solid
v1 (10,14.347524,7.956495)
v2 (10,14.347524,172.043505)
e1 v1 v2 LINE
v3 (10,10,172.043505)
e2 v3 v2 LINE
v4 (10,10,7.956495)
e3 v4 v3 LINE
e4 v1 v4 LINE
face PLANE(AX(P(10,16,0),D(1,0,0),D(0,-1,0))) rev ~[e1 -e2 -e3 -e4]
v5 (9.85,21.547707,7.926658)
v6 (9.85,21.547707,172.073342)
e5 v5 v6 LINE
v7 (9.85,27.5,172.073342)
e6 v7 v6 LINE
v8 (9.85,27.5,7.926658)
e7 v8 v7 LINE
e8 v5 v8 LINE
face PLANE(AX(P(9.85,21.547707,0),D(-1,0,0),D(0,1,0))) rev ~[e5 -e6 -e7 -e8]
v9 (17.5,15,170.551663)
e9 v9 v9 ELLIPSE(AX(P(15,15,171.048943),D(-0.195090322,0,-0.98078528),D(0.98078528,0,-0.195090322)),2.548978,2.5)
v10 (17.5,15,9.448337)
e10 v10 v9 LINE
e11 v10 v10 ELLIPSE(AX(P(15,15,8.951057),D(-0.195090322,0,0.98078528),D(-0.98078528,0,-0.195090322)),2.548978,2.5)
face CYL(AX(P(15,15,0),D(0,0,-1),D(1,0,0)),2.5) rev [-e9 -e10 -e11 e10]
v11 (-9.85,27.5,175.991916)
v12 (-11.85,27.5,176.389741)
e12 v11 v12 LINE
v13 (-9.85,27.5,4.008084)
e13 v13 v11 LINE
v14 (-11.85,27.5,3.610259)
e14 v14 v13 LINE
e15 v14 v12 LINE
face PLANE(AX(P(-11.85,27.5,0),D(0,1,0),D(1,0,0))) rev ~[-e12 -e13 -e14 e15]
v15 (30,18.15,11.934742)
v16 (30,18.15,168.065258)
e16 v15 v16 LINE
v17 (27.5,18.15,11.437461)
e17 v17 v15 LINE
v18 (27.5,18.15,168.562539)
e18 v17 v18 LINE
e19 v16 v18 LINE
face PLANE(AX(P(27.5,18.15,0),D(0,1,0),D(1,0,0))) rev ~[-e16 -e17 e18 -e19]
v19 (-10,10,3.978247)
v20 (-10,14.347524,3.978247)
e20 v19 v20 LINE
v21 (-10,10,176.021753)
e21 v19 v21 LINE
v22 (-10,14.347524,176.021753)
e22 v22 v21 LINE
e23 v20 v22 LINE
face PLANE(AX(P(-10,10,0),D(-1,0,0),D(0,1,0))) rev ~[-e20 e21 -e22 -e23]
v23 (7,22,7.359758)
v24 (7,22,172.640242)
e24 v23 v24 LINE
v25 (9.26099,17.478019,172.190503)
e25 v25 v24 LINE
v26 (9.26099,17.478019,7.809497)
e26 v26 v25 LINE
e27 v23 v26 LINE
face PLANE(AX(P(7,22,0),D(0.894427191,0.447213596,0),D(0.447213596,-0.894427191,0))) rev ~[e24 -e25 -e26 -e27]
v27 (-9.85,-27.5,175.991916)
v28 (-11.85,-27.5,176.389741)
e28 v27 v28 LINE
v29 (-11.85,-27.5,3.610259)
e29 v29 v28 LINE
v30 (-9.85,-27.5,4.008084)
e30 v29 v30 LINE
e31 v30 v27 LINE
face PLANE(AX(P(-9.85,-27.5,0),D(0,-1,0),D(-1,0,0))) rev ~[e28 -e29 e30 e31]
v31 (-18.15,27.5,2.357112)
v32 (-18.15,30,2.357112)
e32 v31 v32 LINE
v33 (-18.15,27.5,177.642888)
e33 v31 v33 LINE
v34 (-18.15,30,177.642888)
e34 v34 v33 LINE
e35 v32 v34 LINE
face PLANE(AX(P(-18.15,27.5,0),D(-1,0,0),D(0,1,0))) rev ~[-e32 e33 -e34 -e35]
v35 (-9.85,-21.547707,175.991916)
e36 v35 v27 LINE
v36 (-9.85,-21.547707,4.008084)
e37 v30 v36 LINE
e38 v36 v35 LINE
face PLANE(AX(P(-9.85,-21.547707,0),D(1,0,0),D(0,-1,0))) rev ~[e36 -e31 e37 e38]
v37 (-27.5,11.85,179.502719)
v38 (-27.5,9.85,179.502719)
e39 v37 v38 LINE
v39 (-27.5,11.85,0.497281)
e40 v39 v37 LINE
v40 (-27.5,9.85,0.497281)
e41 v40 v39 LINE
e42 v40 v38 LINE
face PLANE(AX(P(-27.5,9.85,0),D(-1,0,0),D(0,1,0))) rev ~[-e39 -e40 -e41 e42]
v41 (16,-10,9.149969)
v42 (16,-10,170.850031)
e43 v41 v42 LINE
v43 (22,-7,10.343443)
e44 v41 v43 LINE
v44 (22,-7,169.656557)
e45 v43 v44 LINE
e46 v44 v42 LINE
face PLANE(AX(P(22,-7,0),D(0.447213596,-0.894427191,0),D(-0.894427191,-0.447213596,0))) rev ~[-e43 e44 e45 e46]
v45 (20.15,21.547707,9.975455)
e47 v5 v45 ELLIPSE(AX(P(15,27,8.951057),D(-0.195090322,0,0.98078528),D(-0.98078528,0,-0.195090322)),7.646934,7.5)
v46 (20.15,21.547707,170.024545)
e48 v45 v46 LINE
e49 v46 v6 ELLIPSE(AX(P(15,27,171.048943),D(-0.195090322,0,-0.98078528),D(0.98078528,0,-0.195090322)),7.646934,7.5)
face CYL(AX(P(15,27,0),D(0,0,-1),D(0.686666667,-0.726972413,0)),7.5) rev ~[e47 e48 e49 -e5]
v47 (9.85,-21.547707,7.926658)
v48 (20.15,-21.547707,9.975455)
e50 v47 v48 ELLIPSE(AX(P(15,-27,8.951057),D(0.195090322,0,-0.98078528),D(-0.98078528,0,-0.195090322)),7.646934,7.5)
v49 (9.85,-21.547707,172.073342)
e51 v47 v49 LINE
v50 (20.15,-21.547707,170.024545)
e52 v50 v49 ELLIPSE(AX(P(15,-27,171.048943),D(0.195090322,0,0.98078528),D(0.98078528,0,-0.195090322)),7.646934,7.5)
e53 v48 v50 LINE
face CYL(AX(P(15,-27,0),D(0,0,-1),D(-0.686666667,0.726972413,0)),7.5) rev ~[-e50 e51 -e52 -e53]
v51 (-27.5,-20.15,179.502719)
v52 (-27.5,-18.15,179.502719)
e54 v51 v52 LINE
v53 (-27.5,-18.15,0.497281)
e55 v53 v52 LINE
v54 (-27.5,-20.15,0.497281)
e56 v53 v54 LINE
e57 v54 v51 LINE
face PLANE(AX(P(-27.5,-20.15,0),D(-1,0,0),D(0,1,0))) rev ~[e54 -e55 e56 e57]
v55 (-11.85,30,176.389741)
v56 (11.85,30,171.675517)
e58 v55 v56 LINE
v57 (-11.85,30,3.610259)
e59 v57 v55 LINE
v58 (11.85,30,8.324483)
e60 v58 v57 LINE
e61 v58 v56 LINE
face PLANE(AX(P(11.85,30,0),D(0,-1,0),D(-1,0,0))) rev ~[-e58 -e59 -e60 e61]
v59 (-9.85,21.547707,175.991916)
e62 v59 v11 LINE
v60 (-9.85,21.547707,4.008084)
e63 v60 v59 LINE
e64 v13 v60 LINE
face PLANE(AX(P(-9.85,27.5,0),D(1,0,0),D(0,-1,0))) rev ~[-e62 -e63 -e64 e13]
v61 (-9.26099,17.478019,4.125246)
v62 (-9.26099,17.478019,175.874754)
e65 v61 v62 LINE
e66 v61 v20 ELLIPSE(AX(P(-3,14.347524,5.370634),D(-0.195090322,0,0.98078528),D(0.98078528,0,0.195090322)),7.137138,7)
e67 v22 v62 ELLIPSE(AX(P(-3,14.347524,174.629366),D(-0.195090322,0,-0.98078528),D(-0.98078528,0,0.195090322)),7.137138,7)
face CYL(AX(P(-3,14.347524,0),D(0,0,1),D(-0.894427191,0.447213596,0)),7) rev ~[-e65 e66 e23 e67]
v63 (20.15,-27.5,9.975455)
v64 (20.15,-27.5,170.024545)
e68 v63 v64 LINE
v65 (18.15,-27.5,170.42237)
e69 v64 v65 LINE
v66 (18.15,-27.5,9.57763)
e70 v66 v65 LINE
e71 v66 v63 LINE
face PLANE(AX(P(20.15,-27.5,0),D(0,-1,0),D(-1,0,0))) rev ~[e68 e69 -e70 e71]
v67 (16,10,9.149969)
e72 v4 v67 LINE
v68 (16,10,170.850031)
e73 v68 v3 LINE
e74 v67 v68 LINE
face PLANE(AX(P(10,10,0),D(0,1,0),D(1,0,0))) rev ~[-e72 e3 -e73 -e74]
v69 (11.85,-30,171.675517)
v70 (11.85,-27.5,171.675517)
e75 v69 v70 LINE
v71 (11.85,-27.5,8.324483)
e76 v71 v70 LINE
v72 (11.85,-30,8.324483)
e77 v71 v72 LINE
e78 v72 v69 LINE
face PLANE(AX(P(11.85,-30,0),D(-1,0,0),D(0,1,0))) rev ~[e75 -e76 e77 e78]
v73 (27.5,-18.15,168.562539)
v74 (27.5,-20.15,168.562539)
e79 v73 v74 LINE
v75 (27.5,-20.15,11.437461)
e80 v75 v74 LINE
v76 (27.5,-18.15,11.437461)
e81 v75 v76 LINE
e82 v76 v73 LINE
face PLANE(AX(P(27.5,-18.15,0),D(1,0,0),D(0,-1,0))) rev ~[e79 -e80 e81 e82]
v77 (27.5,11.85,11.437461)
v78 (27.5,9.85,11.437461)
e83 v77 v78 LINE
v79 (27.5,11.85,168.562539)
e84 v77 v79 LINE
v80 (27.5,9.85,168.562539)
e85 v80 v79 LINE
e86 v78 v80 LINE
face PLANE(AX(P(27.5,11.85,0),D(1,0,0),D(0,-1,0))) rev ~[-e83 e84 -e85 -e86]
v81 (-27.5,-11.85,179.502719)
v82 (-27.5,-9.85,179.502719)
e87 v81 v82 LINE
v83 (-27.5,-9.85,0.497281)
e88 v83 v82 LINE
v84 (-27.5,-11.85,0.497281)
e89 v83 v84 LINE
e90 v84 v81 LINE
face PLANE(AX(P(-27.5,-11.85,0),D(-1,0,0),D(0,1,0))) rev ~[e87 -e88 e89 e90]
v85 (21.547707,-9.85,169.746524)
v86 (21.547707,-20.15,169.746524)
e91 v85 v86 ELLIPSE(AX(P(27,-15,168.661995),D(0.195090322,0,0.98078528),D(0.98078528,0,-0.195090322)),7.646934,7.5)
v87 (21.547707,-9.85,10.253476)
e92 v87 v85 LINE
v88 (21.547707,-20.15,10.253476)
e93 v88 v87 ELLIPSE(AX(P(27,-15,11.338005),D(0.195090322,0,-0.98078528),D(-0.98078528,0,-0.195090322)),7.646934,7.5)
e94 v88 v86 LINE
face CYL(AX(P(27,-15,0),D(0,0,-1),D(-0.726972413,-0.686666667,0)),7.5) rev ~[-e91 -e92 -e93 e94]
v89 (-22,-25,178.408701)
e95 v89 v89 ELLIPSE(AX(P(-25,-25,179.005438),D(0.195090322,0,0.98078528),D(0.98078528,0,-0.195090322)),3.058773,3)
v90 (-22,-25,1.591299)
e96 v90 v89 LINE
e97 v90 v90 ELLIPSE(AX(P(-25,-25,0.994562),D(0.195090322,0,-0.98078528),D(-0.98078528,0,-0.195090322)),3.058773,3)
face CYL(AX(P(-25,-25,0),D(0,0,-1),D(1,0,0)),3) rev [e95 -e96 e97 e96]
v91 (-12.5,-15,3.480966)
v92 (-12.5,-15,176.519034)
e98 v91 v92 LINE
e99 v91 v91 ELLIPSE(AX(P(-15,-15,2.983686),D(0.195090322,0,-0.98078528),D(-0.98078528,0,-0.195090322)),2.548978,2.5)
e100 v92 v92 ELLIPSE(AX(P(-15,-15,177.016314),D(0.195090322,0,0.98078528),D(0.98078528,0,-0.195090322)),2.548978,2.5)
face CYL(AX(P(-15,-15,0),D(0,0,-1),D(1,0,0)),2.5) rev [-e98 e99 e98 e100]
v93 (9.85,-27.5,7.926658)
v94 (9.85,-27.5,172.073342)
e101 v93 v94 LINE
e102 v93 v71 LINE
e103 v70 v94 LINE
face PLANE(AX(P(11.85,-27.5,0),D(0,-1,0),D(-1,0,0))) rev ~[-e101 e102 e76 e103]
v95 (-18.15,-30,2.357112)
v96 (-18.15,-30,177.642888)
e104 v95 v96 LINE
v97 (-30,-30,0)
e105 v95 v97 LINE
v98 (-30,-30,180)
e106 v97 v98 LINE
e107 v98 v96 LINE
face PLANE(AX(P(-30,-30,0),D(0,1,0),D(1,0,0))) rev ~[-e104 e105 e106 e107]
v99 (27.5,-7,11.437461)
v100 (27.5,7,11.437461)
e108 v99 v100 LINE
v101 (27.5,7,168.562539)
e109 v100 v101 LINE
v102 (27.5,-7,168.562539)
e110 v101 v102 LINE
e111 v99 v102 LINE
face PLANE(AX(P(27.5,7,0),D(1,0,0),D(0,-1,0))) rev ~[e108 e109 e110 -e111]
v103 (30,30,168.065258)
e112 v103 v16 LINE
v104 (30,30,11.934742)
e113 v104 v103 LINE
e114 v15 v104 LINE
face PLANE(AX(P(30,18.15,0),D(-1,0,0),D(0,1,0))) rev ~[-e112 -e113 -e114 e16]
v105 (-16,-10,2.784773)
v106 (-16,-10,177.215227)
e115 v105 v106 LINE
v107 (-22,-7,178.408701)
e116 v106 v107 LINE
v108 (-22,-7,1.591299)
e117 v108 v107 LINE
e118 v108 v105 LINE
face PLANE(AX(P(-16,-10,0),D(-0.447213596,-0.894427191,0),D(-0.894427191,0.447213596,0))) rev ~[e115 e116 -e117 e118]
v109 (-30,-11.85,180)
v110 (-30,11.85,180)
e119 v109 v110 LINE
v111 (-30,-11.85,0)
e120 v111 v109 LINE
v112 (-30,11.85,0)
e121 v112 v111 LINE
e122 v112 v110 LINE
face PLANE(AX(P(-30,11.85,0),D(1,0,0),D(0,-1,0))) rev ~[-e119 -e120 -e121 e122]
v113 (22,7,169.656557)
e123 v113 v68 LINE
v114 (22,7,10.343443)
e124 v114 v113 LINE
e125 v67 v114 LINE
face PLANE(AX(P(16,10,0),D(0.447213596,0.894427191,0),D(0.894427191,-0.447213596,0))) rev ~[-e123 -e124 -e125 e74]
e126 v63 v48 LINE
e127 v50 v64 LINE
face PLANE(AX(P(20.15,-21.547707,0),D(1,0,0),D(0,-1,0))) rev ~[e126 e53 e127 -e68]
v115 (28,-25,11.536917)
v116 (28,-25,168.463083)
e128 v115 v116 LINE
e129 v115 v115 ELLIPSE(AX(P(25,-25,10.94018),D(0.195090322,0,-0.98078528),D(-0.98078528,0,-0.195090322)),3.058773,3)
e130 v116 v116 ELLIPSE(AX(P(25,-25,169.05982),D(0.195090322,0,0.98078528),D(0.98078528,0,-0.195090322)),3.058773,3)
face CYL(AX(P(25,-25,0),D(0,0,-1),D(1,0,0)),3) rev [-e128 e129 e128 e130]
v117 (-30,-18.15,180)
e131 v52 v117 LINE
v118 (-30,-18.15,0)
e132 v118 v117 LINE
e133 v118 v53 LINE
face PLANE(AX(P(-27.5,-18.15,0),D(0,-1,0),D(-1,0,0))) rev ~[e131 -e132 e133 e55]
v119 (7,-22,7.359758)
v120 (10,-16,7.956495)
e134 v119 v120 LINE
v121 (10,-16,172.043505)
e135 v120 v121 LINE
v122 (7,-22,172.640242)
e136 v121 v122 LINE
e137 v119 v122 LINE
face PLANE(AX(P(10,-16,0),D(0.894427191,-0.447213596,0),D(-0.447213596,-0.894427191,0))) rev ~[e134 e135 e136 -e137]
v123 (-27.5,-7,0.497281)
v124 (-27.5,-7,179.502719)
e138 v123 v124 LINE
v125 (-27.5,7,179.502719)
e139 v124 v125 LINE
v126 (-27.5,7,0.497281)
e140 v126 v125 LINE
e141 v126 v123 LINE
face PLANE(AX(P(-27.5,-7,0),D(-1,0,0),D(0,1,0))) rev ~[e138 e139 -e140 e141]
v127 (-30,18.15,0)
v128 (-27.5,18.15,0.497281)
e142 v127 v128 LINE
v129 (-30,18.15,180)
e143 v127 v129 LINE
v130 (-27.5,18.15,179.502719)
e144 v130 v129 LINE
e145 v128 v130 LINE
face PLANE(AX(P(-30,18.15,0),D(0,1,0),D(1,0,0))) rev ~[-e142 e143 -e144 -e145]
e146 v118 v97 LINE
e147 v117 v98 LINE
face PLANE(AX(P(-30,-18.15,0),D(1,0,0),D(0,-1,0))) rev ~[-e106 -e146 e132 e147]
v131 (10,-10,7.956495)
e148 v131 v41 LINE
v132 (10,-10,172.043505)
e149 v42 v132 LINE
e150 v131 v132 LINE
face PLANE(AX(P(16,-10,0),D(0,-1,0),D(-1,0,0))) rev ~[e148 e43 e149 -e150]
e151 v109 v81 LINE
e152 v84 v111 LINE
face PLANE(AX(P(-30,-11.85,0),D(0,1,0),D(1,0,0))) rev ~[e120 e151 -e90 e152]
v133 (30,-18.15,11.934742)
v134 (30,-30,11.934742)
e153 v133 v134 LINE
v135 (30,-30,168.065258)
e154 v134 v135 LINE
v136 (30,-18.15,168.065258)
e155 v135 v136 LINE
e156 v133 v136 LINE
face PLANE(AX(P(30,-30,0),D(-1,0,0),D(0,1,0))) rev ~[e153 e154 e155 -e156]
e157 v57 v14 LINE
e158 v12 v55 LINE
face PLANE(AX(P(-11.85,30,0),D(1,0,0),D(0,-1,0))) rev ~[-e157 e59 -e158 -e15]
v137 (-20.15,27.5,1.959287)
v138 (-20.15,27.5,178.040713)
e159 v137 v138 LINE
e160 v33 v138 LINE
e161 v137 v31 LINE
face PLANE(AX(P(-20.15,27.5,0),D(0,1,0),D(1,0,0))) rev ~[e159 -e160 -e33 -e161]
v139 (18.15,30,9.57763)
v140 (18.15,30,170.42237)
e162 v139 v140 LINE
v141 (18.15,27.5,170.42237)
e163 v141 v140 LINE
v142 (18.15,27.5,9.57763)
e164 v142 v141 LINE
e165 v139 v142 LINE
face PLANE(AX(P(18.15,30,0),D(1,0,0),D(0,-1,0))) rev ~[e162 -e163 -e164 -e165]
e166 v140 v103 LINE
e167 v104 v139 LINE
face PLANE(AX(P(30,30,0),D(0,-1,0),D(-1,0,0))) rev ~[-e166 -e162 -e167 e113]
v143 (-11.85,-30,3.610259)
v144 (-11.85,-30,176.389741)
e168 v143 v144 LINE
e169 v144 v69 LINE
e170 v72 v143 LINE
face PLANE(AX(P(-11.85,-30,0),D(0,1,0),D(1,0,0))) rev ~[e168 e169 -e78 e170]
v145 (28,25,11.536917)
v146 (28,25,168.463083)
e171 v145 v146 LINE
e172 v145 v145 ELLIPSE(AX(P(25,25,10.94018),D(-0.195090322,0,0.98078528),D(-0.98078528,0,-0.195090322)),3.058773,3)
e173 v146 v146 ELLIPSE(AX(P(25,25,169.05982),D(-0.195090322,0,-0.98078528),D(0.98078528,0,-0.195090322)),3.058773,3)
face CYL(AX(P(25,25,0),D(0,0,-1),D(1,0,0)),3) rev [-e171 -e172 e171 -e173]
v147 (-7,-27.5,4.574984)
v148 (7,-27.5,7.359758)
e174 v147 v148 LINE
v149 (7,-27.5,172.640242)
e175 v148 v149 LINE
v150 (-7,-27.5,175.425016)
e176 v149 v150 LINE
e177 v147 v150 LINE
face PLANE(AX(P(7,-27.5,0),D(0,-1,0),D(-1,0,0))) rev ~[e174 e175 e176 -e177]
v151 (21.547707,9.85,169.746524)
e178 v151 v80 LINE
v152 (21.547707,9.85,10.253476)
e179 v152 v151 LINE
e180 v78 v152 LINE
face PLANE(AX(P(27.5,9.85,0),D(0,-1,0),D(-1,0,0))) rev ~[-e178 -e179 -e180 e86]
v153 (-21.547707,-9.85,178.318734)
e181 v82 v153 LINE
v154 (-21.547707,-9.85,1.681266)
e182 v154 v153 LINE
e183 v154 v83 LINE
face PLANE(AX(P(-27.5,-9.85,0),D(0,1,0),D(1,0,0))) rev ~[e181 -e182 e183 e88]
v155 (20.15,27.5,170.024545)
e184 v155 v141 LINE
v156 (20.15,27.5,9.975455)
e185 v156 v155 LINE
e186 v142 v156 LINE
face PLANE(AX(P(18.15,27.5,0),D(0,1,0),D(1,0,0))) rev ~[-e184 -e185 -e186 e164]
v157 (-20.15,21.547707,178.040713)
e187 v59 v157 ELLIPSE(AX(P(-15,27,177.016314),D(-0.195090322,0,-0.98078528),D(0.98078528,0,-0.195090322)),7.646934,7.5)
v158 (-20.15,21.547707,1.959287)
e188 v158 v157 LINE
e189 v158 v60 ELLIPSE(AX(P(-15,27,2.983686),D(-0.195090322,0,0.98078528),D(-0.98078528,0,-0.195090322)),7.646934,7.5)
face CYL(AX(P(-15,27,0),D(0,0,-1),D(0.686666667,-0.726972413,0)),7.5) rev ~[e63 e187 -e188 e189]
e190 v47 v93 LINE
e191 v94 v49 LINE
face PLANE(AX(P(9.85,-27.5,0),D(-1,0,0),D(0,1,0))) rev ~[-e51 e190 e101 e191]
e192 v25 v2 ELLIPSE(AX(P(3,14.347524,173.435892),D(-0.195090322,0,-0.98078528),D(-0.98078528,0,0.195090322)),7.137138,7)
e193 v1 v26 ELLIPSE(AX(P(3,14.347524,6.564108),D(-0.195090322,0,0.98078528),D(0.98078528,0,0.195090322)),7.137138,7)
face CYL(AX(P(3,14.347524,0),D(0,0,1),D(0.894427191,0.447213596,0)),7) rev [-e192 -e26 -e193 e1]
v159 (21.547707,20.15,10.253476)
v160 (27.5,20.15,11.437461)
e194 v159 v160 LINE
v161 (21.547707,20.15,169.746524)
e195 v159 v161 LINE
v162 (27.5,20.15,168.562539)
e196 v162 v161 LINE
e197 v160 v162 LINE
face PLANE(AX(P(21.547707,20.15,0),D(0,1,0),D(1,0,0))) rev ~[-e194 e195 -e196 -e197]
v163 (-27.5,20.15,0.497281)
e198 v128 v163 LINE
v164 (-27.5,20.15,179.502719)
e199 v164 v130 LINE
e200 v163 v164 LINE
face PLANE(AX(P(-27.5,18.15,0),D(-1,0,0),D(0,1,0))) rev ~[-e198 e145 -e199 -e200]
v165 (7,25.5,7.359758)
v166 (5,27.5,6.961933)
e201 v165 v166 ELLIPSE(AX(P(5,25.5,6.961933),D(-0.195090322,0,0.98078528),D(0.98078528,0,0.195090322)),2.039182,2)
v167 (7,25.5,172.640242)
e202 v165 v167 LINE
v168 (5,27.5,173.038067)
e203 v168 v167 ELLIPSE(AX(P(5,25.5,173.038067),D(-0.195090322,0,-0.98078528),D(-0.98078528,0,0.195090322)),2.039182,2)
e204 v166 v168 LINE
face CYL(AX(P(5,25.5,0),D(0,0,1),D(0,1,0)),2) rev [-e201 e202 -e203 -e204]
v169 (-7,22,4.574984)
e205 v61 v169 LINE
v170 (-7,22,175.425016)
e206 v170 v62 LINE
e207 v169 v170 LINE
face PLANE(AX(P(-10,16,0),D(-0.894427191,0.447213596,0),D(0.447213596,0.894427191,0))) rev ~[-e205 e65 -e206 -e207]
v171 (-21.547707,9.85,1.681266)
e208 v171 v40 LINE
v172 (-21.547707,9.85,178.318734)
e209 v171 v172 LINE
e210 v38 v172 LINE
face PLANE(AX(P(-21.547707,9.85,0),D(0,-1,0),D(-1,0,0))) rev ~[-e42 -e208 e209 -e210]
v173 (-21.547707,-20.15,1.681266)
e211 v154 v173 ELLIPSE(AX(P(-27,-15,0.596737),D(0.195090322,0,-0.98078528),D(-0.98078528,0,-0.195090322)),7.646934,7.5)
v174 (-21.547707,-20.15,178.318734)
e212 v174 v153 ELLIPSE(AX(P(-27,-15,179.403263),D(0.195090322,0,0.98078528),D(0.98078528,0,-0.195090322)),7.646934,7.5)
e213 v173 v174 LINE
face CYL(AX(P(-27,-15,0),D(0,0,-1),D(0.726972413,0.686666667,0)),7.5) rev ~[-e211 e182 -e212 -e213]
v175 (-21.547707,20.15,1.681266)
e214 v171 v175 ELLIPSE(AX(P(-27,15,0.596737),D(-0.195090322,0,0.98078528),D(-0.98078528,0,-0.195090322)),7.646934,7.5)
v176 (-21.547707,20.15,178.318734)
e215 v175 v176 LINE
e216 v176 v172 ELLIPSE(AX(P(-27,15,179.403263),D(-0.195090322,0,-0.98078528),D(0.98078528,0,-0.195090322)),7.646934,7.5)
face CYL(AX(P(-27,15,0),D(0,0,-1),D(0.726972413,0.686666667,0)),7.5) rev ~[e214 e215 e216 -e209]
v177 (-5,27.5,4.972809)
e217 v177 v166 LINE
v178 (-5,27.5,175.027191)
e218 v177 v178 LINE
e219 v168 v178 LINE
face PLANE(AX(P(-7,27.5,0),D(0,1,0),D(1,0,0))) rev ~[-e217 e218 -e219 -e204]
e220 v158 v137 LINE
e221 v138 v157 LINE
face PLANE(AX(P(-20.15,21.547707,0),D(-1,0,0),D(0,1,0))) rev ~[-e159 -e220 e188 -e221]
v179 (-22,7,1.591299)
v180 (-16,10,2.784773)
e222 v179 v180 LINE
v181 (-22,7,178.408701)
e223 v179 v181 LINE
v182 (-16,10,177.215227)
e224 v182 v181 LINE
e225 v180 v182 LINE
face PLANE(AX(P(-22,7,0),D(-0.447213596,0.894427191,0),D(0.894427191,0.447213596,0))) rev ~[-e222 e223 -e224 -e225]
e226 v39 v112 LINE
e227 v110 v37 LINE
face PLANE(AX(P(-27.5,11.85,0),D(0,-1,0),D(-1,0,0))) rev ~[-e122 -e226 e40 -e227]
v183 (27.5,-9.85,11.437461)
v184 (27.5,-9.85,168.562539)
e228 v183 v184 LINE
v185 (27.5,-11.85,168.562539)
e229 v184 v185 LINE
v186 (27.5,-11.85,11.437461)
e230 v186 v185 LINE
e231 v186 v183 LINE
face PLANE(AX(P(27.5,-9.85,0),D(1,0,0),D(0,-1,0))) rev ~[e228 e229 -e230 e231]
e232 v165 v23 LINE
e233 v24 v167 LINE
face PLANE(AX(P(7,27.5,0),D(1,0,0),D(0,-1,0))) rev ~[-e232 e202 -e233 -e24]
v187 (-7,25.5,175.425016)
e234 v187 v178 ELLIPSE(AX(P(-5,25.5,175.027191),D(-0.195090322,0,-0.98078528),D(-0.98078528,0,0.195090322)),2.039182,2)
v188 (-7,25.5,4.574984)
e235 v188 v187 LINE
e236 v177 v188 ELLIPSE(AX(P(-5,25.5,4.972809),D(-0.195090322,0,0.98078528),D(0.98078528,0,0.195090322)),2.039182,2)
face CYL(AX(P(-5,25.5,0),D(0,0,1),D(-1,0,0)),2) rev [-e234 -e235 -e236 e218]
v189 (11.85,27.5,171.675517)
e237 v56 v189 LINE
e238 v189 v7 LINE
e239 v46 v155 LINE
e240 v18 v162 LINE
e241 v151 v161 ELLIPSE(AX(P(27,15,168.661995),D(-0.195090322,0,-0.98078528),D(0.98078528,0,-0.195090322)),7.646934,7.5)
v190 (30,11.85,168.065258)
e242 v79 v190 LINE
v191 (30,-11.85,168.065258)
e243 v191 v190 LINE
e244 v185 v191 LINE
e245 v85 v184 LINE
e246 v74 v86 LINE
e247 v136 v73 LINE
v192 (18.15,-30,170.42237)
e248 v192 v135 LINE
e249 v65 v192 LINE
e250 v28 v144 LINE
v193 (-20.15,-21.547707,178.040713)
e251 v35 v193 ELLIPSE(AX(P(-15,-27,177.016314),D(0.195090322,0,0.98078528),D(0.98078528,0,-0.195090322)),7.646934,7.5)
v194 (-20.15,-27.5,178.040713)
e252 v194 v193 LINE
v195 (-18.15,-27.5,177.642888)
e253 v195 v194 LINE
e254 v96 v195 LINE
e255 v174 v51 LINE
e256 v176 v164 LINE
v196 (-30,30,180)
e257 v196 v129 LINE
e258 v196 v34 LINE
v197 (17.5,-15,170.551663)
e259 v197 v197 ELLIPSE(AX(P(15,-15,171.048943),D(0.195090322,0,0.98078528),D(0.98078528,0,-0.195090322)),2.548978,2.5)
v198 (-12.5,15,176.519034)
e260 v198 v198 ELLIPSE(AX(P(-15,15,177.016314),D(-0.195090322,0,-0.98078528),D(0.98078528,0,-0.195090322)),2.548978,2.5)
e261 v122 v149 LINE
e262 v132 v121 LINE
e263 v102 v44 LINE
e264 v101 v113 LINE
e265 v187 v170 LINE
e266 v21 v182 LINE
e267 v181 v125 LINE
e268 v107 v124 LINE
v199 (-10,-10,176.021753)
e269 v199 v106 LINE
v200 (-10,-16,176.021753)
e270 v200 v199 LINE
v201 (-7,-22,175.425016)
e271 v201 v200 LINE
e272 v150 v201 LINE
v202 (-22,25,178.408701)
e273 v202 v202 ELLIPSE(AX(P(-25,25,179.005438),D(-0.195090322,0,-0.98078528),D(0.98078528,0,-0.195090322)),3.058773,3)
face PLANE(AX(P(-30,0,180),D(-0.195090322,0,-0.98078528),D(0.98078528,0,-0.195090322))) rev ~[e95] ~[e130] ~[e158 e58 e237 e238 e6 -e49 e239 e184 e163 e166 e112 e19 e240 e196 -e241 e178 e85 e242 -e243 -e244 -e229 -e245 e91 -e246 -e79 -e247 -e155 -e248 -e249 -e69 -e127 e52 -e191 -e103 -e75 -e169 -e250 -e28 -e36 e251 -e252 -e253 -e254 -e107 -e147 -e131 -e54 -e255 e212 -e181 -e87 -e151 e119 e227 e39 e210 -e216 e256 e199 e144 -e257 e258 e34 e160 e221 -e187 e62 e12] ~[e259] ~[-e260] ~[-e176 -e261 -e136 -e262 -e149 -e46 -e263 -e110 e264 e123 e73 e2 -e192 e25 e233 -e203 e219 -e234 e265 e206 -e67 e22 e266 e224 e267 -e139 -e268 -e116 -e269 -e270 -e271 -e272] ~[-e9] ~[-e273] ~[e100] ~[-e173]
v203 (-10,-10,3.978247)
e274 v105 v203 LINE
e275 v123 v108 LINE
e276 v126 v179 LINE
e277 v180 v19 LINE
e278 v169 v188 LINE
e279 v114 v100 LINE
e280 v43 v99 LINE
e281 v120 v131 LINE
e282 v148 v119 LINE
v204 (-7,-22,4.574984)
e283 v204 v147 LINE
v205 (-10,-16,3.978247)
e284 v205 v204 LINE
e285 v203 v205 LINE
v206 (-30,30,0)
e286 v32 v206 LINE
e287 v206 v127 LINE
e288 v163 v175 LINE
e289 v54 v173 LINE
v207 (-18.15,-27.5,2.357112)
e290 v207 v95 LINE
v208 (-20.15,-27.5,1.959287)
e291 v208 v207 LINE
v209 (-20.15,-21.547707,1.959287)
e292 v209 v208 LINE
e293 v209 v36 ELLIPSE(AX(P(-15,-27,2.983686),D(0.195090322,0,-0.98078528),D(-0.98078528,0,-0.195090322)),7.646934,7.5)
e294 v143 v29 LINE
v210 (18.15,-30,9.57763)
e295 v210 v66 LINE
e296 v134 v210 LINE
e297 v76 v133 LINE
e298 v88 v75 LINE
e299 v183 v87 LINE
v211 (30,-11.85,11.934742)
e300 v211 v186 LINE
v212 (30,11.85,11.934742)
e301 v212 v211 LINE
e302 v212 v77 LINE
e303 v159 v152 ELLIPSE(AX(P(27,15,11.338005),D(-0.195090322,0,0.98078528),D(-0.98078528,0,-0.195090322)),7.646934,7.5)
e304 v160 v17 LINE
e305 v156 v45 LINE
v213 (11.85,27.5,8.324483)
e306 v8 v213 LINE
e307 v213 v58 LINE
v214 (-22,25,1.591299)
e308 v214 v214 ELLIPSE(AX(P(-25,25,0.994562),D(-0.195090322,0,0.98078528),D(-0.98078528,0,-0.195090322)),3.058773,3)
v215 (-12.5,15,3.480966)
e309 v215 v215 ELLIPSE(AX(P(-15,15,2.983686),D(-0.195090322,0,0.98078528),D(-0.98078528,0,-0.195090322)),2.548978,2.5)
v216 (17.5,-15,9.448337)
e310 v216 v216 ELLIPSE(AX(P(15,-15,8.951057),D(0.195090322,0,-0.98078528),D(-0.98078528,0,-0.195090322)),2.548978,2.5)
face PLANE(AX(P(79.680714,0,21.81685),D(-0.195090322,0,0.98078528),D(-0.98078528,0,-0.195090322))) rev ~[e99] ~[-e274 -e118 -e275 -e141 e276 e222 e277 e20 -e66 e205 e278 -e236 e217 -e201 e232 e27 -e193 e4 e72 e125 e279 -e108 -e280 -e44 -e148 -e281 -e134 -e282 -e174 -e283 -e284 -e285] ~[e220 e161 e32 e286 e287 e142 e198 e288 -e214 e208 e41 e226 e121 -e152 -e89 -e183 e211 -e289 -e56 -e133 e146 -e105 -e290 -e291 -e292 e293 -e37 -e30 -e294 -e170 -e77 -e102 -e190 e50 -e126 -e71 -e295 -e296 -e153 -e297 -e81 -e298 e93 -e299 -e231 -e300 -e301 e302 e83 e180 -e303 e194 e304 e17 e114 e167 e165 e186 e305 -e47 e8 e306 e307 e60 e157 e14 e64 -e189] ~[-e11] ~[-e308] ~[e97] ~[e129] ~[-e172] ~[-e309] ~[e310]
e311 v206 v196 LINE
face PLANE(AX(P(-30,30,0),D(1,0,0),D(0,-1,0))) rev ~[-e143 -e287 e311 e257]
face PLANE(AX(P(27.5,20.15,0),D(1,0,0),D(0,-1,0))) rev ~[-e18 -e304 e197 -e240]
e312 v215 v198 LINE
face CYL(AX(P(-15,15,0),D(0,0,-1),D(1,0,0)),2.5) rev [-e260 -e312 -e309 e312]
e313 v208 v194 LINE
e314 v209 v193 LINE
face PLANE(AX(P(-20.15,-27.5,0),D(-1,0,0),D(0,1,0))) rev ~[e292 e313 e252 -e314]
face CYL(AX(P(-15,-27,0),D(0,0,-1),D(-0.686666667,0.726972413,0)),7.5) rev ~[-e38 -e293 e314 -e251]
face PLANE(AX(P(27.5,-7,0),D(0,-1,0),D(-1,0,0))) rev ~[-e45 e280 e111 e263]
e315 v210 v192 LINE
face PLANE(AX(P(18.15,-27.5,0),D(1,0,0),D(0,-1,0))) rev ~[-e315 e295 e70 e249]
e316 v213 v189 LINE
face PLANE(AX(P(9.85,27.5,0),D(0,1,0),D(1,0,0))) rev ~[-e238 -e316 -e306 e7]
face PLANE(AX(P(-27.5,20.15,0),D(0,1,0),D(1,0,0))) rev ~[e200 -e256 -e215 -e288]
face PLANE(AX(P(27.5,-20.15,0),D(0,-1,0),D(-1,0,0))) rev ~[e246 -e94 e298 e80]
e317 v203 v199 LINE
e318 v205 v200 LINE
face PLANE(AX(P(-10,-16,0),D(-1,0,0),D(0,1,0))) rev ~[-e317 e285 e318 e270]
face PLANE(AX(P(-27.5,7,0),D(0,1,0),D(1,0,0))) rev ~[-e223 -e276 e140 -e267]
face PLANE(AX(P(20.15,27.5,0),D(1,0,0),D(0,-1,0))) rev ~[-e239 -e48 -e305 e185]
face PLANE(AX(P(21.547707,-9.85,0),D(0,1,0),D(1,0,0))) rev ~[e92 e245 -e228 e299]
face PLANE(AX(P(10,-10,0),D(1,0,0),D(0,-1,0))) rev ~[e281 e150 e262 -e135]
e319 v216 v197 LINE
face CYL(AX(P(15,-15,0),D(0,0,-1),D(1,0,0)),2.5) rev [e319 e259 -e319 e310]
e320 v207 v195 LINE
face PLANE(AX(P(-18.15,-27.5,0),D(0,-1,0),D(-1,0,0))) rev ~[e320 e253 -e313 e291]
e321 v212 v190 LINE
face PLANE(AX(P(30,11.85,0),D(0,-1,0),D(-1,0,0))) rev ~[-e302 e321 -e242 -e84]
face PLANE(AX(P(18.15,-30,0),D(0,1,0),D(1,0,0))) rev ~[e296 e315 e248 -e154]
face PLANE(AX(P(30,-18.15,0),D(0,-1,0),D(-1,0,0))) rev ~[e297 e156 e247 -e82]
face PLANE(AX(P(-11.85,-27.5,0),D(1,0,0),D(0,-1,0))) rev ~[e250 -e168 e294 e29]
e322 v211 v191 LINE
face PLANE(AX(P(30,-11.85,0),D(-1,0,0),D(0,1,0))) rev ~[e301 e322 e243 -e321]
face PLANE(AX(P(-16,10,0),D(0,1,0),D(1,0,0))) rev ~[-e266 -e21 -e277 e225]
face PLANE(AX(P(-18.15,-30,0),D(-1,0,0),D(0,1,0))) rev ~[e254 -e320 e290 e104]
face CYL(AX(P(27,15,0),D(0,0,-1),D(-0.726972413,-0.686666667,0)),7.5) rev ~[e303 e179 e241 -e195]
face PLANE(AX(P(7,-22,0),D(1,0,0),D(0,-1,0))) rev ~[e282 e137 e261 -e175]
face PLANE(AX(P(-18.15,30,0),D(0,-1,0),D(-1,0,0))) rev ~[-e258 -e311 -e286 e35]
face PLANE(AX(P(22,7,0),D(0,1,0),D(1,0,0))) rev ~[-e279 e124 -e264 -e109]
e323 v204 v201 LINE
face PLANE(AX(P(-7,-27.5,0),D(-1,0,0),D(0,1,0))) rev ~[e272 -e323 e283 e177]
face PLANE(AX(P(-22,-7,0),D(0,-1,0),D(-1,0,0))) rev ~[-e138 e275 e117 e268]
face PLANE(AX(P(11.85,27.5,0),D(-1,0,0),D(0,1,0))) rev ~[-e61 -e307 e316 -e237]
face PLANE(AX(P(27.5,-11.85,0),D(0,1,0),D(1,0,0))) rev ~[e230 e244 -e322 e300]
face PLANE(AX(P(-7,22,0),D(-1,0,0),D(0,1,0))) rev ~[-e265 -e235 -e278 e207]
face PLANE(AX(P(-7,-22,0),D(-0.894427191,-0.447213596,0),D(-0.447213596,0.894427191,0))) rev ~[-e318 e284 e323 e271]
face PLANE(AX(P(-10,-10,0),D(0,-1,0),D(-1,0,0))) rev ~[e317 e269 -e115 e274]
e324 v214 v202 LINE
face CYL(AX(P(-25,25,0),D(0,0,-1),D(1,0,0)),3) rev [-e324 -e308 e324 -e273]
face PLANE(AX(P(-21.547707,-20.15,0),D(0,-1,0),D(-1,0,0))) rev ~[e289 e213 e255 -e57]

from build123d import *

# Parameters (mm, degrees)
F0_R          = 3
F0_R_2        = 2.5
F1_DEPTH      = 180
F2_R          = 2
F3_R          = 7
F6_DEPTH      = 30
F6_DEPTH_BACK = 30


# Not quite as in the source:
# - a feature names something its author has since deleted; it is built from what else it names


with BuildPart() as f1:
    # F0 (on Top) → F1 (new body)
    with BuildSketch(Plane.XY):
        with BuildLine():
            Line((18.15, -30), (30, -30))
            Line((30, -30), (30, -18.15))
            Line((30, -18.15), (27.5, -18.15))
            Line((27.5, -18.15), (27.5, -20.15))
            Line((27.5, -20.15), (21.5477069044, -20.15))
            ThreePointArc((21.5477069044, -20.15), (19.5, -15), (21.5477069044, -9.85))
            Line((21.5477069044, -9.85), (27.5, -9.85))
            Line((27.5, -9.85), (27.5, -11.85))
            Line((27.5, -11.85), (30, -11.85))
            Line((30, -11.85), (30, 11.85))
            Line((30, 11.85), (27.5, 11.85))
            Line((27.5, 11.85), (27.5, 9.85))
            Line((27.5, 9.85), (21.5477069044, 9.85))
            ThreePointArc((21.5477069044, 9.85), (19.5, 15), (21.5477069044, 20.15))
            Line((21.5477069044, 20.15), (27.5, 20.15))
            Line((27.5, 20.15), (27.5, 18.15))
            Line((27.5, 18.15), (30, 18.15))
            Line((30, 18.15), (30, 30))
            Line((30, 30), (18.15, 30))
            Line((18.15, 30), (18.15, 27.5))
            Line((18.15, 27.5), (20.15, 27.5))
            Line((20.15, 27.5), (20.15, 21.5477069044))
            ThreePointArc((20.15, 21.5477069044), (15, 19.5), (9.85, 21.5477069044))
            Line((9.85, 21.5477069044), (9.85, 27.5))
            Line((9.85, 27.5), (11.85, 27.5))
            Line((11.85, 27.5), (11.85, 30))
            Line((11.85, 30), (-11.85, 30))
            Line((-11.85, 30), (-11.85, 27.5))
            Line((-11.85, 27.5), (-9.85, 27.5))
            Line((-9.85, 27.5), (-9.85, 21.5477069044))
            ThreePointArc((-9.85, 21.5477069044), (-15, 19.5), (-20.15, 21.5477069044))
            Line((-20.15, 21.5477069044), (-20.15, 27.5))
            Line((-20.15, 27.5), (-18.15, 27.5))
            Line((-18.15, 27.5), (-18.15, 30))
            Line((-18.15, 30), (-30, 30))
            Line((-30, 30), (-30, 18.15))
            Line((-30, 18.15), (-27.5, 18.15))
            Line((-27.5, 18.15), (-27.5, 20.15))
            Line((-27.5, 20.15), (-21.5477069044, 20.15))
            ThreePointArc((-21.5477069044, 20.15), (-19.5, 15), (-21.5477069044, 9.85))
            Line((-21.5477069044, 9.85), (-27.5, 9.85))
            Line((-27.5, 9.85), (-27.5, 11.85))
            Line((-27.5, 11.85), (-30, 11.85))
            Line((-30, 11.85), (-30, -11.85))
            Line((-30, -11.85), (-27.5, -11.85))
            Line((-27.5, -11.85), (-27.5, -9.85))
            Line((-27.5, -9.85), (-21.5477069044, -9.85))
            ThreePointArc((-21.5477069044, -9.85), (-19.5, -15), (-21.5477069044, -20.15))
            Line((-21.5477069044, -20.15), (-27.5, -20.15))
            Line((-27.5, -20.15), (-27.5, -18.15))
            Line((-27.5, -18.15), (-30, -18.15))
            Line((-30, -18.15), (-30, -30))
            Line((-30, -30), (-18.15, -30))
            Line((-18.15, -30), (-18.15, -27.5))
            Line((-18.15, -27.5), (-20.15, -27.5))
            Line((-20.15, -27.5), (-20.15, -21.5477069044))
            ThreePointArc((-20.15, -21.5477069044), (-15, -19.5), (-9.85, -21.5477069044))
            Line((-9.85, -21.5477069044), (-9.85, -27.5))
            Line((-9.85, -27.5), (-11.85, -27.5))
            Line((-11.85, -27.5), (-11.85, -30))
            Line((-11.85, -30), (11.85, -30))
            Line((11.85, -30), (11.85, -27.5))
            Line((11.85, -27.5), (9.85, -27.5))
            Line((9.85, -27.5), (9.85, -21.5477069044))
            ThreePointArc((9.85, -21.5477069044), (15, -19.5), (20.15, -21.5477069044))
            Line((20.15, -21.5477069044), (20.15, -27.5))
            Line((20.15, -27.5), (18.15, -27.5))
            Line((18.15, -27.5), (18.15, -30))
        make_face()
        with Locations((-25, -25)):
            Circle(F0_R, mode=Mode.SUBTRACT)
        with Locations((-15, -15)):
            Circle(F0_R_2, mode=Mode.SUBTRACT)
        with Locations((25, -25)):
            Circle(F0_R, mode=Mode.SUBTRACT)
        with Locations((15, -15)):
            Circle(F0_R_2, mode=Mode.SUBTRACT)
        with Locations((-25, 25)):
            Circle(F0_R, mode=Mode.SUBTRACT)
        with Locations((-15, 15)):
            Circle(F0_R_2, mode=Mode.SUBTRACT)
        Polygon((-7, 22), (-7, 27.5), (0, 27.5), (7, 27.5), (7, 22), (10, 16), (10, 10), (16, 10), (22, 7), (27.5, 7), (27.5, 0), (27.5, -7), (22, -7), (16, -10), (10, -10), (10, -16), (7, -22), (7, -27.5), (0, -27.5), (-7, -27.5), (-7, -22), (-10, -16), (-10, -10), (-16, -10), (-22, -7), (-27.5, -7), (-27.5, 0), (-27.5, 7), (-22, 7), (-16, 10), (-10, 10), (-10, 16), align=None, mode=Mode.SUBTRACT)
        with Locations((15, 15)):
            Circle(F0_R_2, mode=Mode.SUBTRACT)
        with Locations((25, 25)):
            Circle(F0_R, mode=Mode.SUBTRACT)
    extrude(amount=F1_DEPTH)

    # F2
    f2_edges = [f1.edges().sort_by_distance(p)[0] for p in [
        (-7, 27.5, 90),
        (7, 27.5, 90),
    ]]
    fillet(f2_edges, radius=F2_R)

    # F3
    f3_edges = [f1.edges().sort_by_distance(p)[0] for p in [
        (-10, 16, 90),
        (10, 16, 90),
    ]]
    fillet(f3_edges, radius=F3_R)

    # F5 (on Front) → F6 (cut, two sides)
    with BuildSketch(Plane.XZ) as f6_sk:
        Polygon((79.680713533, 21.8168503847), (-30, 0), (-17.5886362159, -62.3961393031), (92.0920773171, -40.5792889183), align=None)
        Polygon((97.6667223127, 202.7474358776), (-20.7884412878, 226.3096328978), (-30, 180), (88.4551636005, 156.4378029799), align=None)
    extrude(amount=F6_DEPTH, mode=Mode.SUBTRACT)
    extrude(f6_sk.sketch, amount=-F6_DEPTH_BACK, mode=Mode.SUBTRACT)


solid = f1.part
